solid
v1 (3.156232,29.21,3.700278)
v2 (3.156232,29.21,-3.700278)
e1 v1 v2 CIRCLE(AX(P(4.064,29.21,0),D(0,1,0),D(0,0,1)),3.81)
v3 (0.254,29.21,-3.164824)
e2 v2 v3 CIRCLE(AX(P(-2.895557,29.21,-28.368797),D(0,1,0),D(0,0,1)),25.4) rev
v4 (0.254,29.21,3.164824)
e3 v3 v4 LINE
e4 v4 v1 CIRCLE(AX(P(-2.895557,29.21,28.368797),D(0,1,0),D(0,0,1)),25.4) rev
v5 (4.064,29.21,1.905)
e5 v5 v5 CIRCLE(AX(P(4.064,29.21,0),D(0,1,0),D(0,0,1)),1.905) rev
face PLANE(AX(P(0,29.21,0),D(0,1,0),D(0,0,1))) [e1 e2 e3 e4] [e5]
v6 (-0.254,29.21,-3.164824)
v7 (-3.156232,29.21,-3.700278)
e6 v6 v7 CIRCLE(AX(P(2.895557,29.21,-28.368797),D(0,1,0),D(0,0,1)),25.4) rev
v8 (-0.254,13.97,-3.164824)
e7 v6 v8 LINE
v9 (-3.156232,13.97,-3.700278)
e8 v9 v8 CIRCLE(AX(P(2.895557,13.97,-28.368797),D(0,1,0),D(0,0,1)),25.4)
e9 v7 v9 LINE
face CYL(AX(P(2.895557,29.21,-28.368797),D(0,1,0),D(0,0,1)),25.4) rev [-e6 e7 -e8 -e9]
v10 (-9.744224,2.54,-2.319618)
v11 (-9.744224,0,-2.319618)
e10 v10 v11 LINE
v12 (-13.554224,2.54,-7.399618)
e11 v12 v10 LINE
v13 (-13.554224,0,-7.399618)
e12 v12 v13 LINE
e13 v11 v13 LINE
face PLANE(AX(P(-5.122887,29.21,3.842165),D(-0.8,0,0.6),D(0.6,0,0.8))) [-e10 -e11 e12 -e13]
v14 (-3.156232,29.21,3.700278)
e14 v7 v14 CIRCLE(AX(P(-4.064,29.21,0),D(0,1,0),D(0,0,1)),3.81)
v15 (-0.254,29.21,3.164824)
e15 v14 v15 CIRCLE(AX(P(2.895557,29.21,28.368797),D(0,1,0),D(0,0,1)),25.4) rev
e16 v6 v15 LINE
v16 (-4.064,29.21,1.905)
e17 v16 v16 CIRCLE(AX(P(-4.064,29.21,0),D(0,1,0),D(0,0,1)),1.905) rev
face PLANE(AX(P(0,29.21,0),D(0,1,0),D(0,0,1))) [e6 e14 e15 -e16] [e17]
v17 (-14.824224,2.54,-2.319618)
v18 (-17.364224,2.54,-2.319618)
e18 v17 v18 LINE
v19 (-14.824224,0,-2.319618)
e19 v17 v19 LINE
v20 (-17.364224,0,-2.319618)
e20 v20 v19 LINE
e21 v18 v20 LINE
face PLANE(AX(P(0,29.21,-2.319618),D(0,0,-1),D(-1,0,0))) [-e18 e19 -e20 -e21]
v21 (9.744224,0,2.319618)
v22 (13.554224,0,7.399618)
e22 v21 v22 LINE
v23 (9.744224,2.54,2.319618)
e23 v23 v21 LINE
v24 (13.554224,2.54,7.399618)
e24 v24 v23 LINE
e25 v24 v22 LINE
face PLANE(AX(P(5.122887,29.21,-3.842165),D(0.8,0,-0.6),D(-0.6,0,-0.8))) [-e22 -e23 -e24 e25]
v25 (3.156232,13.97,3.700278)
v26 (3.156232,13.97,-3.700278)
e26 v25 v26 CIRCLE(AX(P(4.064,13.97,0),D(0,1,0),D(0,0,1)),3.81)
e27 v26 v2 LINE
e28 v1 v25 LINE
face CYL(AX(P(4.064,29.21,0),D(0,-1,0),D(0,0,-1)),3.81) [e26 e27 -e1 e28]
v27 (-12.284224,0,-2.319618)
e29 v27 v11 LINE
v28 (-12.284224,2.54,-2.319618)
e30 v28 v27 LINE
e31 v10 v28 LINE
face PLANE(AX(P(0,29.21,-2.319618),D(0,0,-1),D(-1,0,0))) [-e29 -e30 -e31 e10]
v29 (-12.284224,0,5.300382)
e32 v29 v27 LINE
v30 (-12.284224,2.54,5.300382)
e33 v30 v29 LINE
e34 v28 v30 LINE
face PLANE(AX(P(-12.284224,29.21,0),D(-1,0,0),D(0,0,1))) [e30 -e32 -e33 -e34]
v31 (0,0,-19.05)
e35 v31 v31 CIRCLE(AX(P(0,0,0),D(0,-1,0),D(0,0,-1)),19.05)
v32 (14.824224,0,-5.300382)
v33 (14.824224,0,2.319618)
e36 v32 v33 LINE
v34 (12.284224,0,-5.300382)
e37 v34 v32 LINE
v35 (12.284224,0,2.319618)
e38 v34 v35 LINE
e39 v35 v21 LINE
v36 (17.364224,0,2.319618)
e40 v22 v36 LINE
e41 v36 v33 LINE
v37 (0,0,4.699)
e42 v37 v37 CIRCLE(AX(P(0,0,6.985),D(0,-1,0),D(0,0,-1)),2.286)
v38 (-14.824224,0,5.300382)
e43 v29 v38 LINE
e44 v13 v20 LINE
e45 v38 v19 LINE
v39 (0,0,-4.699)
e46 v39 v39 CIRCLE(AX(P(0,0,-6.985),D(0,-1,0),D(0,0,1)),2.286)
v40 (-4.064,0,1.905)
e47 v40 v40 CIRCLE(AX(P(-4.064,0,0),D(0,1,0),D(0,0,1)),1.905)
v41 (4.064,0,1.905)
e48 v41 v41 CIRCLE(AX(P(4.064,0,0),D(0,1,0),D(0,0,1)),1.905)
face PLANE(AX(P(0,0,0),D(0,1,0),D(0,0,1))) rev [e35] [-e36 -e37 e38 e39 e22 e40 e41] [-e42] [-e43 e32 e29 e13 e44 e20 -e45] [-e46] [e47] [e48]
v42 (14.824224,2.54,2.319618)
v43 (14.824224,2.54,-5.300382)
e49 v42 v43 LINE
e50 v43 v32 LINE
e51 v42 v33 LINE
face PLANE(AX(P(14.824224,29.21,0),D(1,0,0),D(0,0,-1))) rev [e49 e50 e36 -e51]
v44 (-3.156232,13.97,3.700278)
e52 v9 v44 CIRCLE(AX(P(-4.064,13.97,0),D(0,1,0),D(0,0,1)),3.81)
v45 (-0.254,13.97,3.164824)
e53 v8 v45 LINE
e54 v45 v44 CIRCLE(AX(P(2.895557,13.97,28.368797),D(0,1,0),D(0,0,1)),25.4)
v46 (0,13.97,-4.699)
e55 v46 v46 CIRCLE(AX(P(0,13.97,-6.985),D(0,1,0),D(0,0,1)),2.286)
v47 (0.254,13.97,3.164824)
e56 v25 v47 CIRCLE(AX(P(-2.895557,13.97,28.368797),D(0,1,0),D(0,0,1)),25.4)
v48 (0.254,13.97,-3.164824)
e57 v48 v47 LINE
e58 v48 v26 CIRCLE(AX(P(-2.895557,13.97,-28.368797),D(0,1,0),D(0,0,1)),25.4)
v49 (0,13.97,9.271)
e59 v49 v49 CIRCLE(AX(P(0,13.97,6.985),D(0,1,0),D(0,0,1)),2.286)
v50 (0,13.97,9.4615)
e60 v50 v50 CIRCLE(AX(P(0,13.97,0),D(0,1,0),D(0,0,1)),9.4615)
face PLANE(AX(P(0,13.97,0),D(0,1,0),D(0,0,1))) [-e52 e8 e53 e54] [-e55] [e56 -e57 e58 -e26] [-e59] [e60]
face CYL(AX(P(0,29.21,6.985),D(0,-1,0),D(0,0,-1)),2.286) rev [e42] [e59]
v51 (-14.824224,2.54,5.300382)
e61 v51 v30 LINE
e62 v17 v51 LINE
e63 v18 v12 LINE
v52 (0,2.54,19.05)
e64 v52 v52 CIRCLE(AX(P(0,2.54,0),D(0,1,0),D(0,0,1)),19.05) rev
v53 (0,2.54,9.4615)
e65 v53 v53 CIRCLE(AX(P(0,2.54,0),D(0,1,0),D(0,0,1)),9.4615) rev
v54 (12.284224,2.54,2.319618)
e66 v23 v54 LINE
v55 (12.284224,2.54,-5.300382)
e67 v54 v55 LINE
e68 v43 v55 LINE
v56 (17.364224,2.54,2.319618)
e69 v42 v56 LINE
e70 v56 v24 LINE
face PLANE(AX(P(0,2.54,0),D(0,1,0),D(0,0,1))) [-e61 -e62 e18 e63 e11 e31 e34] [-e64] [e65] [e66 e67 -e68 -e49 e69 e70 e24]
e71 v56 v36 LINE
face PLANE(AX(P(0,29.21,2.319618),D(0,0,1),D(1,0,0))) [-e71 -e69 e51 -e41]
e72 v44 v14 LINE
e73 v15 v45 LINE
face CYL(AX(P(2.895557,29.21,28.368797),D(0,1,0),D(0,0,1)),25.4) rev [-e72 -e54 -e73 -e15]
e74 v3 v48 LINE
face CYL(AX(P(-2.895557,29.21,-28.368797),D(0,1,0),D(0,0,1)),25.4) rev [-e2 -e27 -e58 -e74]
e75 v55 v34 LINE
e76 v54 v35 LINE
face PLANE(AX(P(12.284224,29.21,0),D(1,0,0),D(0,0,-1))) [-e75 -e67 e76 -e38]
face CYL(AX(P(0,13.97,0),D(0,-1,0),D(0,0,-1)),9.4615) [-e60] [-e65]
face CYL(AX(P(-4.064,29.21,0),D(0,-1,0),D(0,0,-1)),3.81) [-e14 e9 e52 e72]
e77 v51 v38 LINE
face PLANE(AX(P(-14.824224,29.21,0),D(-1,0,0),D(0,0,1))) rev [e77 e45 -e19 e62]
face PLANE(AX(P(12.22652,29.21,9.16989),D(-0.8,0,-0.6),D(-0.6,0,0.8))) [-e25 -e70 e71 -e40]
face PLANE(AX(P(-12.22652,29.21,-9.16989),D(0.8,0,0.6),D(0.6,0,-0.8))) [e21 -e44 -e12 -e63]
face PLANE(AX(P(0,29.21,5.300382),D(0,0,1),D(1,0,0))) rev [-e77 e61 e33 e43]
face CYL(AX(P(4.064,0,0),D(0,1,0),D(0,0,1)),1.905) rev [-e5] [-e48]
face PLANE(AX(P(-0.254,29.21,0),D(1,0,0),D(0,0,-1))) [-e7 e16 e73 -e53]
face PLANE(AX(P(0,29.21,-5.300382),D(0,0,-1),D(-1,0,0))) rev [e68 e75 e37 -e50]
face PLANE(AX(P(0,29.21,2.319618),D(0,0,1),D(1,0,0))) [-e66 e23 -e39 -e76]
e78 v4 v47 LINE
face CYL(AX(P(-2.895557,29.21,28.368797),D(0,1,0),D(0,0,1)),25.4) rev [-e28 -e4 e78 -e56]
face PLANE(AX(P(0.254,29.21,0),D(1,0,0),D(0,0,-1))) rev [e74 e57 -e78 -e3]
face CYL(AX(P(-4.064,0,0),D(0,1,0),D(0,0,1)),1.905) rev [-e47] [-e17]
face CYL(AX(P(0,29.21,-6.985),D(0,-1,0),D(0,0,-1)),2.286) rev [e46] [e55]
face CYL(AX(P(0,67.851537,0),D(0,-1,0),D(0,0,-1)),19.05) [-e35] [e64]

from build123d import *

# Parameters (mm, degrees)
SKETCH1_R           = 9.4615
BOSS_EXTRUDE1_DEPTH = 13.97
SKETCH2_R           = 1.905
CUT_EXTRUDE1_DEPTH  = 20.344272137
BOSS_EXTRUDE2_START = 15.24
SKETCH4_R           = 1.905
BOSS_EXTRUDE2_DEPTH = 15.24
FILLET1_R           = 25.4
SKETCH5_R           = 2.286
CUT_EXTRUDE2_DEPTH  = 33.12886653
SKETCH6_R           = 19.05
SKETCH6_R_2         = 9.4615
BOSS_EXTRUDE3_DEPTH = 2.54
SKETCH7_W           = 2.54
SKETCH7_H           = 7.62
CUT_EXTRUDE3_DEPTH  = 40.736999132
CIRPATTERN1_COUNT   = 2


with BuildPart() as part:
    # Sketch1 → Boss-Extrude1 (new body)
    with BuildSketch(Plane(origin=(0, 0, 0), x_dir=(1, 0, 0), z_dir=(0, 1, 0))):
        with Locations(Location((0, 0, 0), (0, 0, 270))):
            Circle(SKETCH1_R)
    extrude(amount=BOSS_EXTRUDE1_DEPTH)

    # Sketch2 → Cut-Extrude1 (cut, through all)
    with BuildSketch(Plane(origin=(0, 13.97, 0), x_dir=(1, 0, 0), z_dir=(0, 1, 0))):
        with Locations(Location((-4.064, 0, 0), (0, 0, 270))):
            Circle(SKETCH2_R)
        with Locations(Location((4.064, 0, 0), (0, 0, 270))):
            Circle(SKETCH2_R)
    extrude(amount=-CUT_EXTRUDE1_DEPTH, mode=Mode.SUBTRACT)

    # Sketch4 → Boss-Extrude2 (add)
    # profile 1 of 2: a face of its own
    with BuildSketch(Plane(origin=(0, 13.97, 0), x_dir=(1, 0, 0), z_dir=(0, 1, 0)).offset(BOSS_EXTRUDE2_START)):
        with BuildLine():
            Line((-0.254, -3.164823692), (-0.254, 3.164823692))
            ThreePointArc((-0.254, 3.164823692), (-0.888489589, 3.048148824), (-1.486296875, 2.805627666))
            ThreePointArc((-1.486296875, 2.805627666), (-7.874, 0), (-1.486296875, -2.805627666))
            ThreePointArc((-1.486296875, -2.805627666), (-0.888489589, -3.048148824), (-0.254, -3.164823692))
        make_face()
        with Locations(Location((-4.064, 0, 0), (0, 0, 270))):
            Circle(SKETCH4_R, mode=Mode.SUBTRACT)
    # profile 2 of 2: a face of its own
    with BuildSketch(Plane(origin=(0, 13.97, 0), x_dir=(1, 0, 0), z_dir=(0, 1, 0)).offset(BOSS_EXTRUDE2_START)):
        with BuildLine():
            ThreePointArc((1.486296875, 2.805627666), (0.888489589, 3.048148824), (0.254, 3.164823692))
            Line((0.254, 3.164823692), (0.254, -3.164823692))
            ThreePointArc((0.254, -3.164823692), (0.888489589, -3.048148824), (1.486296875, -2.805627666))
            ThreePointArc((1.486296875, -2.805627666), (7.874, 0), (1.486296875, 2.805627666))
        make_face()
        with Locations(Location((4.064, 0, 0), (0, 0, 270))):
            Circle(SKETCH4_R, mode=Mode.SUBTRACT)
    extrude(amount=-BOSS_EXTRUDE2_DEPTH)

    # Fillet1
    # the kernel refuses this fillet: 25.4 mm, written as the material it adds along each edge
    with BuildSketch(Plane(origin=(1.486296875, 29.21, -2.805627666), x_dir=(-0.9600468735563171, 0, -0.27983924059134535), z_dir=(0, -1, 0)), Plane(origin=(-1.486296875, 29.21, 2.805627666), x_dir=(0.960046873556317, 0, 0.27983924059134513), z_dir=(0, -1, 0))) as fillet1_piece_1:
        with BuildLine():
            CenterArc((11.360363176, 23.315626496), FILLET1_R, 239.965558217, 6.660918352)
            Line((-1.352857448, 1.32621947), (-1.60712186, 0.886431329))
            ThreePointArc((-1.60712186, 0.886431329), (-0.948303715, 0.385773959), (-0.434645406, -0.262958878))
            Line((-0.434645406, -0.262958878), (0.102686392, -0.497513321))
            ThreePointArc((0.102686392, -0.497513321), (0.641789953, -0.442458258), (1.08204424, -0.46631253))
            Line((1.08204424, -0.46631253), (1.283579905, 0))
        make_face()
    extrude(amount=19.97621774)
    with BuildSketch(Plane(origin=(-1.486296875, 29.21, -2.805627666), x_dir=(-0.881470671461199, 0, -0.4722387694310403), z_dir=(0, -1, 0)), Plane(origin=(1.486296875, 29.21, 2.805627666), x_dir=(0.8814706714611991, 0, 0.47223876943104), z_dir=(0, -1, 0))) as fillet1_piece_2:
        with BuildLine():
            CenterArc((8.209444083, 24.602465695), FILLET1_R, 248.943194802, 6.660918352)
            Line((-0.916607265, 0.898559122), (-1.099128292, 0.424480991))
            ThreePointArc((-1.099128292, 0.424480991), (-0.768042747, 0.133319135), (-0.421608522, -0.283390639))
            Line((-0.421608522, -0.283390639), (0.12629914, -0.492049314))
            ThreePointArc((0.12629914, -0.492049314), (0.947243548, -0.388369854), (1.768187956, -0.492049314))
            Line((1.768187956, -0.492049314), (1.894487096, 0))
        make_face()
    extrude(amount=19.97621774)

    # Sketch5 → Cut-Extrude2 (cut, through all)
    with BuildSketch(Plane.XZ):
        with Locations(Location((0, 6.985, 0), (0, 0, 270))):
            Circle(SKETCH5_R)
        with Locations(Location((0, -6.985, 0), (0, 0, 90))):
            Circle(SKETCH5_R)
    extrude(amount=-CUT_EXTRUDE2_DEPTH, mode=Mode.SUBTRACT)

    # Sketch6 → Boss-Extrude3 (add)
    with BuildSketch(Plane.XZ):
        with Locations(Location((0, 0, 0), (0, 0, 270))):
            Circle(SKETCH6_R)
        with Locations(Location((0, 0, 0), (0, 0, 90))):
            Circle(SKETCH6_R_2, mode=Mode.SUBTRACT)
    extrude(amount=-BOSS_EXTRUDE3_DEPTH)

    # Sketch7 → Cut-Extrude3 (cut, through all)
    with BuildSketch(Plane.XZ):
        with Locations((13.554224028, -1.490382181)):
            Rectangle(SKETCH7_W, SKETCH7_H)
        Polygon((17.364224028, 2.319617819), (14.824224028, 2.319617819), (12.284224028, 2.319617819), (9.744224028, 2.319617819), (13.554224028, 7.399617819), align=None)
    cut_extrude3 = extrude(amount=-CUT_EXTRUDE3_DEPTH, mode=Mode.SUBTRACT)

    # CirPattern1: Cut-Extrude3 ×2 about axis
    cirpattern1_axis = Axis((0, 0, 0), (0, 1, 0))
    for i in range(1, CIRPATTERN1_COUNT):
        add(cut_extrude3.rotate(cirpattern1_axis, i * 360 / CIRPATTERN1_COUNT), mode=Mode.SUBTRACT)


solid = part.part
